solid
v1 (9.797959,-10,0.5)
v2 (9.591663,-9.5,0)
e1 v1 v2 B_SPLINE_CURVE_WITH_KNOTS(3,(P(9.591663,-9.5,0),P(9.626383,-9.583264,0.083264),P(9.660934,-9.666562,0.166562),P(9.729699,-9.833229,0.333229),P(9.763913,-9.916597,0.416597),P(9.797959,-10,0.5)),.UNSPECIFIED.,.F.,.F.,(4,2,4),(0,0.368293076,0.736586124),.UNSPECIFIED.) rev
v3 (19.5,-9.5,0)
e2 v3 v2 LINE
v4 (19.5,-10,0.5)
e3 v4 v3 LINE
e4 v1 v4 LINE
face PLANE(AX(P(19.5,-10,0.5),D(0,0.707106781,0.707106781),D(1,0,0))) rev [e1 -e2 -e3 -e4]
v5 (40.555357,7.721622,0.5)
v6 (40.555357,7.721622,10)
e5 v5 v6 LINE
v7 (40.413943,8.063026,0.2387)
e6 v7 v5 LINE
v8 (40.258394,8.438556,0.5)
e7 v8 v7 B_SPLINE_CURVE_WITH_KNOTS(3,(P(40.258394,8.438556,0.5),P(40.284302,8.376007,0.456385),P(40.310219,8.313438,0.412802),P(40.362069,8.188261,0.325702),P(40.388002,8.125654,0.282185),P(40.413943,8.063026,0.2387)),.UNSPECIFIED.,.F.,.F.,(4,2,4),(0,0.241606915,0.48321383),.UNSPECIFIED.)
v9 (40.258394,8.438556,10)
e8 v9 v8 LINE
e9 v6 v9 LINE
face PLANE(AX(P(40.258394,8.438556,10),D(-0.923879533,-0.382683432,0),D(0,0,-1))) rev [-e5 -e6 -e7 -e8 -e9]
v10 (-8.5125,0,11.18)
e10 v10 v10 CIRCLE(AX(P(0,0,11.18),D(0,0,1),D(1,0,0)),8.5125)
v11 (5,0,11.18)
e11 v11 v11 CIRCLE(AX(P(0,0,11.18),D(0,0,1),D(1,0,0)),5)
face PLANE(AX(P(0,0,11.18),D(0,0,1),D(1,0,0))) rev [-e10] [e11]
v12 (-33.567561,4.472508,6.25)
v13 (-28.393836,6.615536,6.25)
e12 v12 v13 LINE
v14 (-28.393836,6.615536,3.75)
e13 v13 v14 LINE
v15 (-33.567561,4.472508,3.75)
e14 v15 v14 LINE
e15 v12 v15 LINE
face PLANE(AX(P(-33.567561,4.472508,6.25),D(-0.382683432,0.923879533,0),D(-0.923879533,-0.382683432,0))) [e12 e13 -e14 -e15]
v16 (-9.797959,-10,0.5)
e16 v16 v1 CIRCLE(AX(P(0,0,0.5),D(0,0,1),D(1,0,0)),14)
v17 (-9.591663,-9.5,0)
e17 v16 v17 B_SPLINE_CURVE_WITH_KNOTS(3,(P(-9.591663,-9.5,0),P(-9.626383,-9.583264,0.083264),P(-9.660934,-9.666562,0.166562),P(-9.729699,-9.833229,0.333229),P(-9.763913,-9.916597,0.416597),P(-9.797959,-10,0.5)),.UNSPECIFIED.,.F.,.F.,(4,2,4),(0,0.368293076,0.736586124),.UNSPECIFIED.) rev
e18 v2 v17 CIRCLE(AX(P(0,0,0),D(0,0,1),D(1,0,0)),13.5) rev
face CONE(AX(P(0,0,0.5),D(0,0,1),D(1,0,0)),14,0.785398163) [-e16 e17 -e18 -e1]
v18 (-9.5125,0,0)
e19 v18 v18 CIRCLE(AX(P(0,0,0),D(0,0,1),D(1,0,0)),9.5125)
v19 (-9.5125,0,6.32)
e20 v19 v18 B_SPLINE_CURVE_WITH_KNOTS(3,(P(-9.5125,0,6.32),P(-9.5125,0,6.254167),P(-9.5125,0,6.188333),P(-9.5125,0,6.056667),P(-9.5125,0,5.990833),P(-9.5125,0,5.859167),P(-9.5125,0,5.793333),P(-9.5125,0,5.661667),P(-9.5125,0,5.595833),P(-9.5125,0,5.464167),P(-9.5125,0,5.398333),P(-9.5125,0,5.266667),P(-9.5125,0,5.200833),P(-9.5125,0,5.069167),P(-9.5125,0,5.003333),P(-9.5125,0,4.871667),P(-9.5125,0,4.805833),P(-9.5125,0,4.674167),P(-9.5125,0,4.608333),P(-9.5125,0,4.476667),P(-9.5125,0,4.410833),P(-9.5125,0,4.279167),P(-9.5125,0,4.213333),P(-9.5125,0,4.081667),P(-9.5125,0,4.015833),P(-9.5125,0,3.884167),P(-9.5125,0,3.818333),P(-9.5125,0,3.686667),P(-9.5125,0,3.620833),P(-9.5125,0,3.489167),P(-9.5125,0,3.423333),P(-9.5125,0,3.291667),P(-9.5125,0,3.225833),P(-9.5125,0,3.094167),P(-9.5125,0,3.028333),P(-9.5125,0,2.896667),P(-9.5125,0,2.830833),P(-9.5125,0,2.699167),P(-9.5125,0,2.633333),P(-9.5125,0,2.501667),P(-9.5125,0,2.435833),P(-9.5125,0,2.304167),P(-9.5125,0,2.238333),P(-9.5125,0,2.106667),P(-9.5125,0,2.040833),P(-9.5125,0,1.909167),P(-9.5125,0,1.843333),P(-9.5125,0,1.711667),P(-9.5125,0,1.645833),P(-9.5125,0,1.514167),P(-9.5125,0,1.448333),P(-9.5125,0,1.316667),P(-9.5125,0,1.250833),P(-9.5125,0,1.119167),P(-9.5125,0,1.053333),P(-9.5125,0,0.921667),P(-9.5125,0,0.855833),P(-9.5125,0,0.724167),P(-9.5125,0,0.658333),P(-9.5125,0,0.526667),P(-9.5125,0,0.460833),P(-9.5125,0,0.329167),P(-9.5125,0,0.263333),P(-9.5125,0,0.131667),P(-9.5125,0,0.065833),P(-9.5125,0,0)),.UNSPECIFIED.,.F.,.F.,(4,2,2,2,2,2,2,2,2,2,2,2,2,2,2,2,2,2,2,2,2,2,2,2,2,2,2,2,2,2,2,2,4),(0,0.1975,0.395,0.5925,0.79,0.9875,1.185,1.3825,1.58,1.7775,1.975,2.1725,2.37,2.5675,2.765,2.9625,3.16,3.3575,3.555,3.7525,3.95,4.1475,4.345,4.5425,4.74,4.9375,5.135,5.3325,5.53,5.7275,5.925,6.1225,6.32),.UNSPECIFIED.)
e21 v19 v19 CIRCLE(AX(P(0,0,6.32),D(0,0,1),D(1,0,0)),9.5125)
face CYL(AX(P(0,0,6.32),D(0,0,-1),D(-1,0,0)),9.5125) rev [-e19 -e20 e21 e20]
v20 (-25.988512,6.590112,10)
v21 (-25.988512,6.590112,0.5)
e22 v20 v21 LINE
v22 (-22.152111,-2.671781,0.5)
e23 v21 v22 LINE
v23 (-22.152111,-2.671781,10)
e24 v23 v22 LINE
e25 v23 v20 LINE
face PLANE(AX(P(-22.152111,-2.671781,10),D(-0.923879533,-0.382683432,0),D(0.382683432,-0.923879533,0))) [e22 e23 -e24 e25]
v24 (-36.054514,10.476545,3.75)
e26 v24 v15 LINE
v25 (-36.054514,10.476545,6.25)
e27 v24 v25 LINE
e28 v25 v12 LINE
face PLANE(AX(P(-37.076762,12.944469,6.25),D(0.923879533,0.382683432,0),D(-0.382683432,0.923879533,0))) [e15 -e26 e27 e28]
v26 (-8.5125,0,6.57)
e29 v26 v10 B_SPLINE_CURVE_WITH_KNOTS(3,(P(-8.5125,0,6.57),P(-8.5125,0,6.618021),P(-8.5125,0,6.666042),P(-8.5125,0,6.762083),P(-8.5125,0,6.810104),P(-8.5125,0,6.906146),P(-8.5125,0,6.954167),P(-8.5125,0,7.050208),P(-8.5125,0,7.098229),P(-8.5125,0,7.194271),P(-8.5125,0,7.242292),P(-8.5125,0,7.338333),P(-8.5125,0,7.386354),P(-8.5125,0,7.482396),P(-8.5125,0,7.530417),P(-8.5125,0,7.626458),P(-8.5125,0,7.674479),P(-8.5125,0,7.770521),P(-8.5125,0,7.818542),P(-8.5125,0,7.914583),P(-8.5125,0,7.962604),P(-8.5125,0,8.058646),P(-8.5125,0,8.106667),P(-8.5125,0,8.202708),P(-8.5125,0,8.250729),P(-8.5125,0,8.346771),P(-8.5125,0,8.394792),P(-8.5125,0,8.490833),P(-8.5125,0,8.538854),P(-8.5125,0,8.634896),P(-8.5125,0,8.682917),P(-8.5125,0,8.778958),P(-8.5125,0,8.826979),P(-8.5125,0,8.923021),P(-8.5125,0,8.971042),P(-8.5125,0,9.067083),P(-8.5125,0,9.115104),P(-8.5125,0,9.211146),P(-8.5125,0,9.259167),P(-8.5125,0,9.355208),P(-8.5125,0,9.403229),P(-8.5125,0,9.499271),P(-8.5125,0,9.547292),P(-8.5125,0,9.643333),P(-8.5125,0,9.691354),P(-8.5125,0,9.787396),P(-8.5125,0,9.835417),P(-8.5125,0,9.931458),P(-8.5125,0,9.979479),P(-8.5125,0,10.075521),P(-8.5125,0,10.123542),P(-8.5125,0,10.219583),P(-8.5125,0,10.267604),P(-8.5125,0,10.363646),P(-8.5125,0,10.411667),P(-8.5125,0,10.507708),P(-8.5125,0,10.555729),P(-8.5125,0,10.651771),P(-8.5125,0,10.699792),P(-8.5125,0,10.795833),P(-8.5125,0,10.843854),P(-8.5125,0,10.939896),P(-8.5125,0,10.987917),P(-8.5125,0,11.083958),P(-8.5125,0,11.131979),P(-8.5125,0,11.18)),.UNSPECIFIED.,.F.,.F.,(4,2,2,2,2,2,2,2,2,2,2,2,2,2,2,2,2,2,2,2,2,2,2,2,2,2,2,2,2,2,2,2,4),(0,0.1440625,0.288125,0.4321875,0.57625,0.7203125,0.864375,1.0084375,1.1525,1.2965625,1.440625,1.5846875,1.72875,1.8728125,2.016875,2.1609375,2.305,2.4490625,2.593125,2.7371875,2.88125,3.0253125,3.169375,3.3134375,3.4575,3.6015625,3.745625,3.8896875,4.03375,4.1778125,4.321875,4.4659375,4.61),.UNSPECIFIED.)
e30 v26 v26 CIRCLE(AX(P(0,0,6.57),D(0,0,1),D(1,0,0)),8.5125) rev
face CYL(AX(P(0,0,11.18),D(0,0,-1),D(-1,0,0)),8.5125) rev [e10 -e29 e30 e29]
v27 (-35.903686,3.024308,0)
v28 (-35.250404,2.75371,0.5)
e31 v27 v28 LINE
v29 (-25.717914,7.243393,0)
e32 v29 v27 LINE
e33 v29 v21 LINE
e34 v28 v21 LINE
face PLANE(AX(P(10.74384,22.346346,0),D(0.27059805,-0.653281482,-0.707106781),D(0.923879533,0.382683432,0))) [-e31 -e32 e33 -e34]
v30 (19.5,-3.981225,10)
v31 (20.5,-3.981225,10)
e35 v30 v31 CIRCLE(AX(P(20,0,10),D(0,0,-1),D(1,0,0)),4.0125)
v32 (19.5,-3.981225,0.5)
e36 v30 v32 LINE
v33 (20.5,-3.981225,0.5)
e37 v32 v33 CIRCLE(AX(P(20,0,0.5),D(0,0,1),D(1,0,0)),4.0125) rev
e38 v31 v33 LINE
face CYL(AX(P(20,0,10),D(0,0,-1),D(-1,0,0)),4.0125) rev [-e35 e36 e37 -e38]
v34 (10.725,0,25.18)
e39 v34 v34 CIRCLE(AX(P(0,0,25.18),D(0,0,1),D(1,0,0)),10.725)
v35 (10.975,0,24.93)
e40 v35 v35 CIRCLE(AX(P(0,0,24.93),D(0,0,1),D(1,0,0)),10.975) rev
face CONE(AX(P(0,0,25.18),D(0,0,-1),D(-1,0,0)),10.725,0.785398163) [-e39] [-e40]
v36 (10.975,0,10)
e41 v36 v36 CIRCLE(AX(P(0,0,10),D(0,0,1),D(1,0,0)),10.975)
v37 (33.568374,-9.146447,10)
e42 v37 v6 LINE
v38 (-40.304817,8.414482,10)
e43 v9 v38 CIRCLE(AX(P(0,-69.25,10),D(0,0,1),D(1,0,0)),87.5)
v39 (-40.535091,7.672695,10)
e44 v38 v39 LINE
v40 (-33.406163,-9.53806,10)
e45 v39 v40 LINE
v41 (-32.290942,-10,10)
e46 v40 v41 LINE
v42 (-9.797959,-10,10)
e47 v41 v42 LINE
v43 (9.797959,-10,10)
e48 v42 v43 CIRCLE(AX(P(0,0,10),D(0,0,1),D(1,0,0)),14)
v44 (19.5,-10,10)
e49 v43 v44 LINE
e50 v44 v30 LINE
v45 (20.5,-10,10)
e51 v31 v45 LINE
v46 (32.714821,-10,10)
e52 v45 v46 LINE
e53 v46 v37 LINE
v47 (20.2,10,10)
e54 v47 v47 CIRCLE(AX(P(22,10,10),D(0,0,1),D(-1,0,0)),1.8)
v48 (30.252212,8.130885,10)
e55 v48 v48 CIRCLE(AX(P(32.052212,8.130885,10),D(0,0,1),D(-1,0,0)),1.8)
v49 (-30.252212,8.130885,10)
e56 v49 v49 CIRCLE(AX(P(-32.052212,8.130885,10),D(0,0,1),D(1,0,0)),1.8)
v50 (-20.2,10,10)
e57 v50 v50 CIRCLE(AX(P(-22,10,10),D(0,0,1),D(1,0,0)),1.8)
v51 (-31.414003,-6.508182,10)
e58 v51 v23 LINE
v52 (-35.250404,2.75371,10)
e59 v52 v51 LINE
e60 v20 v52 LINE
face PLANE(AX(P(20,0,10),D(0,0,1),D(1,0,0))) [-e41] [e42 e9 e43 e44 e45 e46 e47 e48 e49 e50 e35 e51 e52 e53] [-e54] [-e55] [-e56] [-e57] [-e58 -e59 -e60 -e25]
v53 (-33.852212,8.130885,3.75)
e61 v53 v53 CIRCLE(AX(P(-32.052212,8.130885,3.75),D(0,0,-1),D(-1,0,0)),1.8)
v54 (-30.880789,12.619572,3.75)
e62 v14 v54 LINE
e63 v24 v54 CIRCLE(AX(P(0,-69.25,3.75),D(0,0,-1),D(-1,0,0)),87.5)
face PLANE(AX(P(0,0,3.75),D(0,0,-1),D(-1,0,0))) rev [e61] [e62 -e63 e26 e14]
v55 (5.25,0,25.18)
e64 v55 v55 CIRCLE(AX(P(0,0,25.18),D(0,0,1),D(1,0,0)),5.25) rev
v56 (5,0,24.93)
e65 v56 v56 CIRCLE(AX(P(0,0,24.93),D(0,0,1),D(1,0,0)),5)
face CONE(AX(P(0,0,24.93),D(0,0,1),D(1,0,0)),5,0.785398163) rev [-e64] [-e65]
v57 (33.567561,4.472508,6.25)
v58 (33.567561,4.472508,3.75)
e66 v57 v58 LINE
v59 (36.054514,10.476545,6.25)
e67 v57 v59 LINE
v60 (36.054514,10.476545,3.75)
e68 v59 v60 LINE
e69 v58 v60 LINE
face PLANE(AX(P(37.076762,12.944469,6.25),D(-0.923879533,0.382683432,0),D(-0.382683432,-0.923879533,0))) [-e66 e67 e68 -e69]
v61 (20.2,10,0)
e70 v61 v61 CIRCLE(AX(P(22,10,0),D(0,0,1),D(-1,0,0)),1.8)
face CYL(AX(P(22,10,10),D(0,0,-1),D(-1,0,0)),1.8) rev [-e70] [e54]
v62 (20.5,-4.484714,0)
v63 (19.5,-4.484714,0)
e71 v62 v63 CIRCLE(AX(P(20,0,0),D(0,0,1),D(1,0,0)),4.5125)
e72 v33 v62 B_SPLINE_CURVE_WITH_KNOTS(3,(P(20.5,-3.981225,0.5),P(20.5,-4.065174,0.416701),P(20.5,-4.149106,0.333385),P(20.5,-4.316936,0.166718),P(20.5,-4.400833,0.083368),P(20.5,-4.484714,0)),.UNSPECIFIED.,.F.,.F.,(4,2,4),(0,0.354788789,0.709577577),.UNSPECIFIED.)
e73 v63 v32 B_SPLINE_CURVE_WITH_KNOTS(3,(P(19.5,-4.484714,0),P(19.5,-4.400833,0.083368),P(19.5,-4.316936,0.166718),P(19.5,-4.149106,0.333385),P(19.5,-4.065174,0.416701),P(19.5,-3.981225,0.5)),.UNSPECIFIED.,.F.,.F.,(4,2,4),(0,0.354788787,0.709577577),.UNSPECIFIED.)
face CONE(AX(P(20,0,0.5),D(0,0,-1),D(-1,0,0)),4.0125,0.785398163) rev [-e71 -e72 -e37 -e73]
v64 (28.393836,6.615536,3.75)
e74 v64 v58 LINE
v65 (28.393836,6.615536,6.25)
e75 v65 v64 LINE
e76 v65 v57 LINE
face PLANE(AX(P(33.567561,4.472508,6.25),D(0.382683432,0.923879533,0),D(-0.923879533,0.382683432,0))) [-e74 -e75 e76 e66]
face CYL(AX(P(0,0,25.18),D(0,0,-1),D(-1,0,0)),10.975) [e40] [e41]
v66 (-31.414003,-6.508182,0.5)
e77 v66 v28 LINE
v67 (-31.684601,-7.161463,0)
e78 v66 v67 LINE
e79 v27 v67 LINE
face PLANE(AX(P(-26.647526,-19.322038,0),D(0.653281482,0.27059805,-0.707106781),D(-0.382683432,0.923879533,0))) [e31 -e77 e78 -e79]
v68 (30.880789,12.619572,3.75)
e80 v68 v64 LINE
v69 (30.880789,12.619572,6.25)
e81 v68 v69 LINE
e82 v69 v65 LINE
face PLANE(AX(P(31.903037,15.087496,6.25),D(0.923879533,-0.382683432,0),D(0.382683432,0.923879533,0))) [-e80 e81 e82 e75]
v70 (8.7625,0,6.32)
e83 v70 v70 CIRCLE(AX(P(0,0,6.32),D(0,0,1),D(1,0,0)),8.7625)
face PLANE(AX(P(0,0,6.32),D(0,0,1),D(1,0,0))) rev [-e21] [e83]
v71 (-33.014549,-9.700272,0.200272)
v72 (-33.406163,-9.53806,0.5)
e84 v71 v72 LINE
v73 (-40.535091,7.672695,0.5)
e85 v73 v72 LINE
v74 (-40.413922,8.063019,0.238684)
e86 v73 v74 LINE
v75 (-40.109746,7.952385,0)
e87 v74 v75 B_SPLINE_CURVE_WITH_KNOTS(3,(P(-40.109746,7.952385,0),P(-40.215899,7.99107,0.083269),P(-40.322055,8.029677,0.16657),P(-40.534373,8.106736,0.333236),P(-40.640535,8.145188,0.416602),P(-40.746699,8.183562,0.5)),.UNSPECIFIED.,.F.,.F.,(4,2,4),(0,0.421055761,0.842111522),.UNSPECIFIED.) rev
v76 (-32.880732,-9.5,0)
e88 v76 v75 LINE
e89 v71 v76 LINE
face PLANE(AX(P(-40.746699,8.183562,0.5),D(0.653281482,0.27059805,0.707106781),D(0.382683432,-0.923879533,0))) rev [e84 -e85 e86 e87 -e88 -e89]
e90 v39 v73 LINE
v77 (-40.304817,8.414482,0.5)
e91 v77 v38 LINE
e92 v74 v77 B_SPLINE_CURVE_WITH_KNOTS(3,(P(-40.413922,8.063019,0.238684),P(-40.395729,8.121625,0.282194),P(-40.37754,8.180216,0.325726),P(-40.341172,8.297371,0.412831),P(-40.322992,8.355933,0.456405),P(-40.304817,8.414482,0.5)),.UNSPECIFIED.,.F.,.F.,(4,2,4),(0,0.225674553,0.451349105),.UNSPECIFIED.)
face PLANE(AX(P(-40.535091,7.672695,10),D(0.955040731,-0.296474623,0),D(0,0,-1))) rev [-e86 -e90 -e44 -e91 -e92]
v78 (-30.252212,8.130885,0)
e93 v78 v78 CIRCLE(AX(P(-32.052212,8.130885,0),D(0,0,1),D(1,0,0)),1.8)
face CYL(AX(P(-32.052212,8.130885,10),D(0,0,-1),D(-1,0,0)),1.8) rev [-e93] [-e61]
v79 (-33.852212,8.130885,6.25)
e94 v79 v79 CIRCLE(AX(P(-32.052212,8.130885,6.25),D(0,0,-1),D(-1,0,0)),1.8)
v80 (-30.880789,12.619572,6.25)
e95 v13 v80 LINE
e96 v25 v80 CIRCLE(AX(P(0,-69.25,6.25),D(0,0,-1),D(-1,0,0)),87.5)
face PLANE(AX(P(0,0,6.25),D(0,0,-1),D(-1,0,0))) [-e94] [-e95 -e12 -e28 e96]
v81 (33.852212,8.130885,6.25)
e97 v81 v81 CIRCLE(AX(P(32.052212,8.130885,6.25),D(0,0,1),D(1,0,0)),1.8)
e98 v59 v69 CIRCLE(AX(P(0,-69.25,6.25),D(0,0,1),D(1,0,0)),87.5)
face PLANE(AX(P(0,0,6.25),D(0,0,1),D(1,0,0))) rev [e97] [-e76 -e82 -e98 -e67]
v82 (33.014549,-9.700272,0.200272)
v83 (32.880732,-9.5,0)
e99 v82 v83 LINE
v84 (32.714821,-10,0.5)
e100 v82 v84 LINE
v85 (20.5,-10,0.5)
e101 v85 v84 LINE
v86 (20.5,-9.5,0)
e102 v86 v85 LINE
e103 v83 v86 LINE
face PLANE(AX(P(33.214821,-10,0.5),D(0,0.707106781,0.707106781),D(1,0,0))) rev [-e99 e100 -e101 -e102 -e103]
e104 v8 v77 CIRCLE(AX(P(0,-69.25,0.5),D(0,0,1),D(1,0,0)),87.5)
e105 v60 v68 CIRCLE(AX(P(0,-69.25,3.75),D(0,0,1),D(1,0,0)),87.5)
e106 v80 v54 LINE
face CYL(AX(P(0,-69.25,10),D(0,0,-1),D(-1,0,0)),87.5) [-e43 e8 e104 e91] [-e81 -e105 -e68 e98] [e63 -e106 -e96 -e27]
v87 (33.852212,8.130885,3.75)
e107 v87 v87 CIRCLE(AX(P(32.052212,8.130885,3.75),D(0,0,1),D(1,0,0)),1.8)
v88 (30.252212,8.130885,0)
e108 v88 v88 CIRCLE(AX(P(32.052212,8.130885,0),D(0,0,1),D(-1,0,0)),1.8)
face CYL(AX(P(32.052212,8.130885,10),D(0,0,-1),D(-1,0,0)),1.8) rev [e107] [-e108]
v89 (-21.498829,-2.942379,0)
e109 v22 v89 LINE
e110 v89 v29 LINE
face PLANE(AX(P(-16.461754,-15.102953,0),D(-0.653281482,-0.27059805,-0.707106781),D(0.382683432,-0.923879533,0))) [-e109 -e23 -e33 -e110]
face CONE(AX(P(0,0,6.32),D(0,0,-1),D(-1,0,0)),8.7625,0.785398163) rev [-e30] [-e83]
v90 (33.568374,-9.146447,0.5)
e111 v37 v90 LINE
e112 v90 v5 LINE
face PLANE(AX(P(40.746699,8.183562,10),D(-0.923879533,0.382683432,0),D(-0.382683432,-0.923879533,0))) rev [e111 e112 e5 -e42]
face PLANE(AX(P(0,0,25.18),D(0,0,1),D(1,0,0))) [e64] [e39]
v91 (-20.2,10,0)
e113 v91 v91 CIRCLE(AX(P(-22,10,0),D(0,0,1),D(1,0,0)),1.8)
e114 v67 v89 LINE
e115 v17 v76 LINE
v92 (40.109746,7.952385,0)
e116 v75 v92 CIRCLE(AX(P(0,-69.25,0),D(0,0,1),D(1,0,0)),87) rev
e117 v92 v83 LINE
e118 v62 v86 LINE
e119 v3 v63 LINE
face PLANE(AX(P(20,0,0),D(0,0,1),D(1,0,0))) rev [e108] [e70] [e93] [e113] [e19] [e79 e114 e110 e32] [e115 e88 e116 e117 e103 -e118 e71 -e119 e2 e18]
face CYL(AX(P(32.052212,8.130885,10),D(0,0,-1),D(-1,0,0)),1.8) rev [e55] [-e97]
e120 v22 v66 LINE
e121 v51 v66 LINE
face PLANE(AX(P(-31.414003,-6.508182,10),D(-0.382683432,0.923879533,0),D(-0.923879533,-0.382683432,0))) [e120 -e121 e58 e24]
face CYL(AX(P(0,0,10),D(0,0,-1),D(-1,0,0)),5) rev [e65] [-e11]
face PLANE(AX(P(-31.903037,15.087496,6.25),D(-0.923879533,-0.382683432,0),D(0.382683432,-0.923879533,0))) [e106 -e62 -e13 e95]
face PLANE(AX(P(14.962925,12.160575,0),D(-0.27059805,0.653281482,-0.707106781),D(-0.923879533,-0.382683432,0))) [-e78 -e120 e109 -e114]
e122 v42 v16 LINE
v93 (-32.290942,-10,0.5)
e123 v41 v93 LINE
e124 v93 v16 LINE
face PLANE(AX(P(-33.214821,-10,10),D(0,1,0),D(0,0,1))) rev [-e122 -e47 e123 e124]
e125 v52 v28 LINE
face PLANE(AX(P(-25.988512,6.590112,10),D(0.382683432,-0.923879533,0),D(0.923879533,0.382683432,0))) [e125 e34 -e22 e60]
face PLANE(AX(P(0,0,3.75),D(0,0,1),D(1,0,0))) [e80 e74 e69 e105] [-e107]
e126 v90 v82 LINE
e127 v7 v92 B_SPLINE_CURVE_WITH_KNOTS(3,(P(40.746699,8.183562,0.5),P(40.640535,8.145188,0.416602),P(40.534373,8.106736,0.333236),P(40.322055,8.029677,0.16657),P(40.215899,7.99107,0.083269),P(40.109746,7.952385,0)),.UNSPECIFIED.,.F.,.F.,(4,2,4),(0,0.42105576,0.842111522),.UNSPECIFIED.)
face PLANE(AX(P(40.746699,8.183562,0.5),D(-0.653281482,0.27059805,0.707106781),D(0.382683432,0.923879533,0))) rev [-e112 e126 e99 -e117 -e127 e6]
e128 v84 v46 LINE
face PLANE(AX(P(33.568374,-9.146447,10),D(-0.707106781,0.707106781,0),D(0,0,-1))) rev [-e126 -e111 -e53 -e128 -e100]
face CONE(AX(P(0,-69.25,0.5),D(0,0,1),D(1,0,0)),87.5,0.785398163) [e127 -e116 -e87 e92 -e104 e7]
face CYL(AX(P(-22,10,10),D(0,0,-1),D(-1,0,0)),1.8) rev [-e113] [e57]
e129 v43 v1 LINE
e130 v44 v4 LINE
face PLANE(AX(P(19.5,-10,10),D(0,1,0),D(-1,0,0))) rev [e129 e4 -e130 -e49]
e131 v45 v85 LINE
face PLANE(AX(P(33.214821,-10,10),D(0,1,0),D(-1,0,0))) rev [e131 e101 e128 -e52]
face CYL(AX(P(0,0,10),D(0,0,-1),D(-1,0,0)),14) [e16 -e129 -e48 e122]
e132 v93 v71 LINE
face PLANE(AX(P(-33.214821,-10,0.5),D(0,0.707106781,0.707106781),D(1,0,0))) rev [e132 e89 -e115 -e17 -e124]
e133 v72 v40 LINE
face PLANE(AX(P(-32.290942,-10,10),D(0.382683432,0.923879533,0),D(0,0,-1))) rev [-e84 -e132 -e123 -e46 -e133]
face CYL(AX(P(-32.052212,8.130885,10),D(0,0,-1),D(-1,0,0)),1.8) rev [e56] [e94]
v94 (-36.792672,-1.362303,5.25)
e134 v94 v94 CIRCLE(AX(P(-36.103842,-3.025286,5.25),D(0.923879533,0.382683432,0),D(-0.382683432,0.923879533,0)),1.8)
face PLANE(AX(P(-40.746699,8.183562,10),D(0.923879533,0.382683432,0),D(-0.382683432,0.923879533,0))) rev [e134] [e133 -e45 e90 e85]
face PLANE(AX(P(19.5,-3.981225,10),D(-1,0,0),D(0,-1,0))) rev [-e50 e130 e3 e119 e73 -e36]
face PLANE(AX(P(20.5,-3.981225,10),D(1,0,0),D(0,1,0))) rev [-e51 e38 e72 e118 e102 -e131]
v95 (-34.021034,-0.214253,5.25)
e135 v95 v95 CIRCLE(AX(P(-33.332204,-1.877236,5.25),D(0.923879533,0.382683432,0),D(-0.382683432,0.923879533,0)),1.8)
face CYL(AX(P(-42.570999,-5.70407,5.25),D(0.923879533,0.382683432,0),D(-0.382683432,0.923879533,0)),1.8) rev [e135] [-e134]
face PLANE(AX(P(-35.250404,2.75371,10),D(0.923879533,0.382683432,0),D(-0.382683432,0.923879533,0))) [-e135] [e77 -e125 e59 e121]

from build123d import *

# Parameters (mm, degrees)
SKETCH1_R           = 5
SKETCH1_R_2         = 1.8
BOSS_EXTRUDE1_DEPTH = 10
CHAMFER1_SIZE       = 0.5
CUT_EXTRUDE2_DEPTH  = 2.5
CHAMFER2_SIZE       = 0.5
SKETCH4_R           = 1.8
CUT_EXTRUDE3_DEPTH  = 10
CHAMFER3_SIZE       = 0.5
CHAMFER3_SIZE_2     = 0.923879533
CHAMFER3_SIZE_3     = 0.552958444
SKETCH7_R           = 10.975
SKETCH7_R_2         = 5
BOSS_EXTRUDE2_DEPTH = 15.18
SKETCH8_R           = 8.5125
CUT_EXTRUDE6_DEPTH  = 11.18
SKETCH9_R           = 9.5125
CUT_EXTRUDE8_DEPTH  = 6.32
CHAMFER4_SIZE       = 0.25


with BuildPart() as part:
    # Sketch1 → Boss-Extrude1 (new body)
    with BuildSketch(Plane.XY):
        with BuildLine():
            Line((-40.746699048, 8.183561953), (-33.214821075, -10))
            Line((-33.214821075, -10), (-9.797958971, -10))
            ThreePointArc((-9.797958971, -10), (0, -14), (9.797958971, -10))
            Line((9.797958971, -10), (19.5, -10))
            Line((19.5, -10), (19.5, -3.981225471))
            ThreePointArc((19.5, -3.981225471), (20, 4.0125), (20.5, -3.981225471))
            Line((20.5, -3.981225471), (20.5, -10))
            Line((20.5, -10), (33.214821075, -10))
            Line((33.214821075, -10), (40.746699048, 8.183561953))
            ThreePointArc((40.746699048, 8.183561953), (0, 18.25), (-40.746699048, 8.183561953))
        make_face()
        Circle(SKETCH1_R, mode=Mode.SUBTRACT)
        with Locations((-32.052211881, 8.130884627)):
            Circle(SKETCH1_R_2, mode=Mode.SUBTRACT)
        with Locations(Location((32.052211881, 8.130884627, 0), (0, 0, 180))):
            Circle(SKETCH1_R_2, mode=Mode.SUBTRACT)
        with Locations((-22, 10)):
            Circle(SKETCH1_R_2, mode=Mode.SUBTRACT)
        with Locations(Location((22, 10, 0), (0, 0, 180))):
            Circle(SKETCH1_R_2, mode=Mode.SUBTRACT)
        Polygon((-25.988511975, 6.5901118), (-35.250404289, 2.75371039), (-31.414002879, -6.508181923), (-22.152110566, -2.671780514), align=None, mode=Mode.SUBTRACT)
    extrude(amount=BOSS_EXTRUDE1_DEPTH)

    # Chamfer1
    chamfer1_edges = [part.edges().sort_by_distance(p)[0] for p in [
        (20, 4.0125, 0),
        (-24.070311271, 1.959165643, 0),
        (-30.619458132, 4.671911095, 0),
        (-33.332203584, -1.877235766, 0),
        (-26.783056723, -4.589981218, 0),
    ]]
    chamfer(chamfer1_edges, length=CHAMFER1_SIZE)

    # Sketch3 → Cut-Extrude2 (cut)
    with BuildSketch(Plane.XY.offset(3.75)):
        Polygon((-37.076762037, 12.944469155), (-33.567560961, 4.472508325), (-28.393835579, 6.615535546), (-31.903036655, 15.087496376), align=None)
        Polygon((37.076762037, 12.944469155), (33.567560961, 4.472508325), (28.393835579, 6.615535546), (31.903036655, 15.087496376), align=None)
    extrude(amount=CUT_EXTRUDE2_DEPTH, mode=Mode.SUBTRACT)

    # Chamfer2
    chamfer2_edges = [part.edges().sort_by_distance(p)[0] for p in [
        (14.648979486, -10, 0),
        (0, -14, 0),
        (-21.506390023, -10, 0),
        (-36.980760062, -0.908219024, 0),
        (0, 18.25, 0),
        (36.980760062, -0.908219024, 0),
        (26.857410538, -10, 0),
    ]]
    chamfer(chamfer2_edges, length=CHAMFER2_SIZE)

    # Sketch4 → Cut-Extrude3 (cut)
    with BuildSketch(Plane(origin=(-29.114518455, -12.059628406, 0), x_dir=(0, 0, -1), z_dir=(0.9238795325112882, 0.38268343236508634, 0))):
        with Locations(Location((-5.25, 11.021342374, 0), (0, 0, 90))):
            Circle(SKETCH4_R)
    extrude(amount=-CUT_EXTRUDE3_DEPTH, mode=Mode.SUBTRACT)

    # Chamfer3
    # the kernel refuses this chamfer: 0.923879533, 0.552958444, 0.5 mm, written as the material it takes off along each edge
    with BuildSketch(Plane(origin=(40.746699048, 8.183561953, -0.920037939), x_dir=(-0.38268343236508906, -0.923879532511287, 0), z_dir=(0, 0, 1))) as chamfer3_piece_1:
        with BuildLine():
            Line((CHAMFER3_SIZE, 0), (-0.048717445, -0.548717445))
            ThreePointArc((-0.048717445, -0.548717445), (-0.025540103, -0.282767493), (0, 0))
            Line((0, 0), (CHAMFER3_SIZE, 0))
        make_face()
    extrude(amount=12.340075878, mode=Mode.SUBTRACT)
    with BuildSketch(Plane(origin=(33.214821075, -10, -1.895315111), x_dir=(-1, 0, 0), z_dir=(0, 0, 1)), Plane(origin=(-33.214821075, -10, -1.895315111), x_dir=(-0.38268343236508656, 0.9238795325112881, 0), z_dir=(0, 0, 1))) as chamfer3_piece_2:
        Polygon((CHAMFER3_SIZE, 0), (-CHAMFER3_SIZE_2 * 0.382683432163, -CHAMFER3_SIZE_2 * 0.923879532023), (0, 0), align=None)
    extrude(amount=14.290630221, mode=Mode.SUBTRACT)
    with BuildSketch(Plane(origin=(-40.746699048, 8.183561953, -0.925350902), x_dir=(0.38268343236508684, -0.9238795325112881, 0), z_dir=(0, 0, 1))) as chamfer3_piece_3:
        with BuildLine():
            Line((CHAMFER3_SIZE_3, 0), (-0.04424113, 0.496614821))
            ThreePointArc((-0.04424113, 0.496614821), (-0.0231658, 0.256042208), (0, 0))
            Line((0, 0), (CHAMFER3_SIZE_3, 0))
        make_face()
    extrude(amount=12.350701805, mode=Mode.SUBTRACT)

    # Sketch7 → Boss-Extrude2 (add)
    with BuildSketch(Plane.XY.offset(10)):
        Circle(SKETCH7_R)
        Circle(SKETCH7_R_2, mode=Mode.SUBTRACT)
    extrude(amount=BOSS_EXTRUDE2_DEPTH)

    # Sketch8 → Cut-Extrude6 (cut)
    with BuildSketch(Plane.XY):
        with Locations(Location((0, 0, 0), (0, 0, 180))):
            Circle(SKETCH8_R)
    extrude(amount=CUT_EXTRUDE6_DEPTH, mode=Mode.SUBTRACT)

    # Sketch9 → Cut-Extrude8 (cut)
    with BuildSketch(Plane.XY):
        with Locations(Location((0, 0, 0), (0, 0, 180))):
            Circle(SKETCH9_R)
    extrude(amount=CUT_EXTRUDE8_DEPTH, mode=Mode.SUBTRACT)

    # Chamfer4
    chamfer4_edges = [part.edges().sort_by_distance(p)[0] for p in [
        (-10.975, 0, 25.18),
        (-5, 0, 25.18),
        (8.5125, 0, 6.32),
    ]]
    chamfer(chamfer4_edges, length=CHAMFER4_SIZE)


solid = part.part
